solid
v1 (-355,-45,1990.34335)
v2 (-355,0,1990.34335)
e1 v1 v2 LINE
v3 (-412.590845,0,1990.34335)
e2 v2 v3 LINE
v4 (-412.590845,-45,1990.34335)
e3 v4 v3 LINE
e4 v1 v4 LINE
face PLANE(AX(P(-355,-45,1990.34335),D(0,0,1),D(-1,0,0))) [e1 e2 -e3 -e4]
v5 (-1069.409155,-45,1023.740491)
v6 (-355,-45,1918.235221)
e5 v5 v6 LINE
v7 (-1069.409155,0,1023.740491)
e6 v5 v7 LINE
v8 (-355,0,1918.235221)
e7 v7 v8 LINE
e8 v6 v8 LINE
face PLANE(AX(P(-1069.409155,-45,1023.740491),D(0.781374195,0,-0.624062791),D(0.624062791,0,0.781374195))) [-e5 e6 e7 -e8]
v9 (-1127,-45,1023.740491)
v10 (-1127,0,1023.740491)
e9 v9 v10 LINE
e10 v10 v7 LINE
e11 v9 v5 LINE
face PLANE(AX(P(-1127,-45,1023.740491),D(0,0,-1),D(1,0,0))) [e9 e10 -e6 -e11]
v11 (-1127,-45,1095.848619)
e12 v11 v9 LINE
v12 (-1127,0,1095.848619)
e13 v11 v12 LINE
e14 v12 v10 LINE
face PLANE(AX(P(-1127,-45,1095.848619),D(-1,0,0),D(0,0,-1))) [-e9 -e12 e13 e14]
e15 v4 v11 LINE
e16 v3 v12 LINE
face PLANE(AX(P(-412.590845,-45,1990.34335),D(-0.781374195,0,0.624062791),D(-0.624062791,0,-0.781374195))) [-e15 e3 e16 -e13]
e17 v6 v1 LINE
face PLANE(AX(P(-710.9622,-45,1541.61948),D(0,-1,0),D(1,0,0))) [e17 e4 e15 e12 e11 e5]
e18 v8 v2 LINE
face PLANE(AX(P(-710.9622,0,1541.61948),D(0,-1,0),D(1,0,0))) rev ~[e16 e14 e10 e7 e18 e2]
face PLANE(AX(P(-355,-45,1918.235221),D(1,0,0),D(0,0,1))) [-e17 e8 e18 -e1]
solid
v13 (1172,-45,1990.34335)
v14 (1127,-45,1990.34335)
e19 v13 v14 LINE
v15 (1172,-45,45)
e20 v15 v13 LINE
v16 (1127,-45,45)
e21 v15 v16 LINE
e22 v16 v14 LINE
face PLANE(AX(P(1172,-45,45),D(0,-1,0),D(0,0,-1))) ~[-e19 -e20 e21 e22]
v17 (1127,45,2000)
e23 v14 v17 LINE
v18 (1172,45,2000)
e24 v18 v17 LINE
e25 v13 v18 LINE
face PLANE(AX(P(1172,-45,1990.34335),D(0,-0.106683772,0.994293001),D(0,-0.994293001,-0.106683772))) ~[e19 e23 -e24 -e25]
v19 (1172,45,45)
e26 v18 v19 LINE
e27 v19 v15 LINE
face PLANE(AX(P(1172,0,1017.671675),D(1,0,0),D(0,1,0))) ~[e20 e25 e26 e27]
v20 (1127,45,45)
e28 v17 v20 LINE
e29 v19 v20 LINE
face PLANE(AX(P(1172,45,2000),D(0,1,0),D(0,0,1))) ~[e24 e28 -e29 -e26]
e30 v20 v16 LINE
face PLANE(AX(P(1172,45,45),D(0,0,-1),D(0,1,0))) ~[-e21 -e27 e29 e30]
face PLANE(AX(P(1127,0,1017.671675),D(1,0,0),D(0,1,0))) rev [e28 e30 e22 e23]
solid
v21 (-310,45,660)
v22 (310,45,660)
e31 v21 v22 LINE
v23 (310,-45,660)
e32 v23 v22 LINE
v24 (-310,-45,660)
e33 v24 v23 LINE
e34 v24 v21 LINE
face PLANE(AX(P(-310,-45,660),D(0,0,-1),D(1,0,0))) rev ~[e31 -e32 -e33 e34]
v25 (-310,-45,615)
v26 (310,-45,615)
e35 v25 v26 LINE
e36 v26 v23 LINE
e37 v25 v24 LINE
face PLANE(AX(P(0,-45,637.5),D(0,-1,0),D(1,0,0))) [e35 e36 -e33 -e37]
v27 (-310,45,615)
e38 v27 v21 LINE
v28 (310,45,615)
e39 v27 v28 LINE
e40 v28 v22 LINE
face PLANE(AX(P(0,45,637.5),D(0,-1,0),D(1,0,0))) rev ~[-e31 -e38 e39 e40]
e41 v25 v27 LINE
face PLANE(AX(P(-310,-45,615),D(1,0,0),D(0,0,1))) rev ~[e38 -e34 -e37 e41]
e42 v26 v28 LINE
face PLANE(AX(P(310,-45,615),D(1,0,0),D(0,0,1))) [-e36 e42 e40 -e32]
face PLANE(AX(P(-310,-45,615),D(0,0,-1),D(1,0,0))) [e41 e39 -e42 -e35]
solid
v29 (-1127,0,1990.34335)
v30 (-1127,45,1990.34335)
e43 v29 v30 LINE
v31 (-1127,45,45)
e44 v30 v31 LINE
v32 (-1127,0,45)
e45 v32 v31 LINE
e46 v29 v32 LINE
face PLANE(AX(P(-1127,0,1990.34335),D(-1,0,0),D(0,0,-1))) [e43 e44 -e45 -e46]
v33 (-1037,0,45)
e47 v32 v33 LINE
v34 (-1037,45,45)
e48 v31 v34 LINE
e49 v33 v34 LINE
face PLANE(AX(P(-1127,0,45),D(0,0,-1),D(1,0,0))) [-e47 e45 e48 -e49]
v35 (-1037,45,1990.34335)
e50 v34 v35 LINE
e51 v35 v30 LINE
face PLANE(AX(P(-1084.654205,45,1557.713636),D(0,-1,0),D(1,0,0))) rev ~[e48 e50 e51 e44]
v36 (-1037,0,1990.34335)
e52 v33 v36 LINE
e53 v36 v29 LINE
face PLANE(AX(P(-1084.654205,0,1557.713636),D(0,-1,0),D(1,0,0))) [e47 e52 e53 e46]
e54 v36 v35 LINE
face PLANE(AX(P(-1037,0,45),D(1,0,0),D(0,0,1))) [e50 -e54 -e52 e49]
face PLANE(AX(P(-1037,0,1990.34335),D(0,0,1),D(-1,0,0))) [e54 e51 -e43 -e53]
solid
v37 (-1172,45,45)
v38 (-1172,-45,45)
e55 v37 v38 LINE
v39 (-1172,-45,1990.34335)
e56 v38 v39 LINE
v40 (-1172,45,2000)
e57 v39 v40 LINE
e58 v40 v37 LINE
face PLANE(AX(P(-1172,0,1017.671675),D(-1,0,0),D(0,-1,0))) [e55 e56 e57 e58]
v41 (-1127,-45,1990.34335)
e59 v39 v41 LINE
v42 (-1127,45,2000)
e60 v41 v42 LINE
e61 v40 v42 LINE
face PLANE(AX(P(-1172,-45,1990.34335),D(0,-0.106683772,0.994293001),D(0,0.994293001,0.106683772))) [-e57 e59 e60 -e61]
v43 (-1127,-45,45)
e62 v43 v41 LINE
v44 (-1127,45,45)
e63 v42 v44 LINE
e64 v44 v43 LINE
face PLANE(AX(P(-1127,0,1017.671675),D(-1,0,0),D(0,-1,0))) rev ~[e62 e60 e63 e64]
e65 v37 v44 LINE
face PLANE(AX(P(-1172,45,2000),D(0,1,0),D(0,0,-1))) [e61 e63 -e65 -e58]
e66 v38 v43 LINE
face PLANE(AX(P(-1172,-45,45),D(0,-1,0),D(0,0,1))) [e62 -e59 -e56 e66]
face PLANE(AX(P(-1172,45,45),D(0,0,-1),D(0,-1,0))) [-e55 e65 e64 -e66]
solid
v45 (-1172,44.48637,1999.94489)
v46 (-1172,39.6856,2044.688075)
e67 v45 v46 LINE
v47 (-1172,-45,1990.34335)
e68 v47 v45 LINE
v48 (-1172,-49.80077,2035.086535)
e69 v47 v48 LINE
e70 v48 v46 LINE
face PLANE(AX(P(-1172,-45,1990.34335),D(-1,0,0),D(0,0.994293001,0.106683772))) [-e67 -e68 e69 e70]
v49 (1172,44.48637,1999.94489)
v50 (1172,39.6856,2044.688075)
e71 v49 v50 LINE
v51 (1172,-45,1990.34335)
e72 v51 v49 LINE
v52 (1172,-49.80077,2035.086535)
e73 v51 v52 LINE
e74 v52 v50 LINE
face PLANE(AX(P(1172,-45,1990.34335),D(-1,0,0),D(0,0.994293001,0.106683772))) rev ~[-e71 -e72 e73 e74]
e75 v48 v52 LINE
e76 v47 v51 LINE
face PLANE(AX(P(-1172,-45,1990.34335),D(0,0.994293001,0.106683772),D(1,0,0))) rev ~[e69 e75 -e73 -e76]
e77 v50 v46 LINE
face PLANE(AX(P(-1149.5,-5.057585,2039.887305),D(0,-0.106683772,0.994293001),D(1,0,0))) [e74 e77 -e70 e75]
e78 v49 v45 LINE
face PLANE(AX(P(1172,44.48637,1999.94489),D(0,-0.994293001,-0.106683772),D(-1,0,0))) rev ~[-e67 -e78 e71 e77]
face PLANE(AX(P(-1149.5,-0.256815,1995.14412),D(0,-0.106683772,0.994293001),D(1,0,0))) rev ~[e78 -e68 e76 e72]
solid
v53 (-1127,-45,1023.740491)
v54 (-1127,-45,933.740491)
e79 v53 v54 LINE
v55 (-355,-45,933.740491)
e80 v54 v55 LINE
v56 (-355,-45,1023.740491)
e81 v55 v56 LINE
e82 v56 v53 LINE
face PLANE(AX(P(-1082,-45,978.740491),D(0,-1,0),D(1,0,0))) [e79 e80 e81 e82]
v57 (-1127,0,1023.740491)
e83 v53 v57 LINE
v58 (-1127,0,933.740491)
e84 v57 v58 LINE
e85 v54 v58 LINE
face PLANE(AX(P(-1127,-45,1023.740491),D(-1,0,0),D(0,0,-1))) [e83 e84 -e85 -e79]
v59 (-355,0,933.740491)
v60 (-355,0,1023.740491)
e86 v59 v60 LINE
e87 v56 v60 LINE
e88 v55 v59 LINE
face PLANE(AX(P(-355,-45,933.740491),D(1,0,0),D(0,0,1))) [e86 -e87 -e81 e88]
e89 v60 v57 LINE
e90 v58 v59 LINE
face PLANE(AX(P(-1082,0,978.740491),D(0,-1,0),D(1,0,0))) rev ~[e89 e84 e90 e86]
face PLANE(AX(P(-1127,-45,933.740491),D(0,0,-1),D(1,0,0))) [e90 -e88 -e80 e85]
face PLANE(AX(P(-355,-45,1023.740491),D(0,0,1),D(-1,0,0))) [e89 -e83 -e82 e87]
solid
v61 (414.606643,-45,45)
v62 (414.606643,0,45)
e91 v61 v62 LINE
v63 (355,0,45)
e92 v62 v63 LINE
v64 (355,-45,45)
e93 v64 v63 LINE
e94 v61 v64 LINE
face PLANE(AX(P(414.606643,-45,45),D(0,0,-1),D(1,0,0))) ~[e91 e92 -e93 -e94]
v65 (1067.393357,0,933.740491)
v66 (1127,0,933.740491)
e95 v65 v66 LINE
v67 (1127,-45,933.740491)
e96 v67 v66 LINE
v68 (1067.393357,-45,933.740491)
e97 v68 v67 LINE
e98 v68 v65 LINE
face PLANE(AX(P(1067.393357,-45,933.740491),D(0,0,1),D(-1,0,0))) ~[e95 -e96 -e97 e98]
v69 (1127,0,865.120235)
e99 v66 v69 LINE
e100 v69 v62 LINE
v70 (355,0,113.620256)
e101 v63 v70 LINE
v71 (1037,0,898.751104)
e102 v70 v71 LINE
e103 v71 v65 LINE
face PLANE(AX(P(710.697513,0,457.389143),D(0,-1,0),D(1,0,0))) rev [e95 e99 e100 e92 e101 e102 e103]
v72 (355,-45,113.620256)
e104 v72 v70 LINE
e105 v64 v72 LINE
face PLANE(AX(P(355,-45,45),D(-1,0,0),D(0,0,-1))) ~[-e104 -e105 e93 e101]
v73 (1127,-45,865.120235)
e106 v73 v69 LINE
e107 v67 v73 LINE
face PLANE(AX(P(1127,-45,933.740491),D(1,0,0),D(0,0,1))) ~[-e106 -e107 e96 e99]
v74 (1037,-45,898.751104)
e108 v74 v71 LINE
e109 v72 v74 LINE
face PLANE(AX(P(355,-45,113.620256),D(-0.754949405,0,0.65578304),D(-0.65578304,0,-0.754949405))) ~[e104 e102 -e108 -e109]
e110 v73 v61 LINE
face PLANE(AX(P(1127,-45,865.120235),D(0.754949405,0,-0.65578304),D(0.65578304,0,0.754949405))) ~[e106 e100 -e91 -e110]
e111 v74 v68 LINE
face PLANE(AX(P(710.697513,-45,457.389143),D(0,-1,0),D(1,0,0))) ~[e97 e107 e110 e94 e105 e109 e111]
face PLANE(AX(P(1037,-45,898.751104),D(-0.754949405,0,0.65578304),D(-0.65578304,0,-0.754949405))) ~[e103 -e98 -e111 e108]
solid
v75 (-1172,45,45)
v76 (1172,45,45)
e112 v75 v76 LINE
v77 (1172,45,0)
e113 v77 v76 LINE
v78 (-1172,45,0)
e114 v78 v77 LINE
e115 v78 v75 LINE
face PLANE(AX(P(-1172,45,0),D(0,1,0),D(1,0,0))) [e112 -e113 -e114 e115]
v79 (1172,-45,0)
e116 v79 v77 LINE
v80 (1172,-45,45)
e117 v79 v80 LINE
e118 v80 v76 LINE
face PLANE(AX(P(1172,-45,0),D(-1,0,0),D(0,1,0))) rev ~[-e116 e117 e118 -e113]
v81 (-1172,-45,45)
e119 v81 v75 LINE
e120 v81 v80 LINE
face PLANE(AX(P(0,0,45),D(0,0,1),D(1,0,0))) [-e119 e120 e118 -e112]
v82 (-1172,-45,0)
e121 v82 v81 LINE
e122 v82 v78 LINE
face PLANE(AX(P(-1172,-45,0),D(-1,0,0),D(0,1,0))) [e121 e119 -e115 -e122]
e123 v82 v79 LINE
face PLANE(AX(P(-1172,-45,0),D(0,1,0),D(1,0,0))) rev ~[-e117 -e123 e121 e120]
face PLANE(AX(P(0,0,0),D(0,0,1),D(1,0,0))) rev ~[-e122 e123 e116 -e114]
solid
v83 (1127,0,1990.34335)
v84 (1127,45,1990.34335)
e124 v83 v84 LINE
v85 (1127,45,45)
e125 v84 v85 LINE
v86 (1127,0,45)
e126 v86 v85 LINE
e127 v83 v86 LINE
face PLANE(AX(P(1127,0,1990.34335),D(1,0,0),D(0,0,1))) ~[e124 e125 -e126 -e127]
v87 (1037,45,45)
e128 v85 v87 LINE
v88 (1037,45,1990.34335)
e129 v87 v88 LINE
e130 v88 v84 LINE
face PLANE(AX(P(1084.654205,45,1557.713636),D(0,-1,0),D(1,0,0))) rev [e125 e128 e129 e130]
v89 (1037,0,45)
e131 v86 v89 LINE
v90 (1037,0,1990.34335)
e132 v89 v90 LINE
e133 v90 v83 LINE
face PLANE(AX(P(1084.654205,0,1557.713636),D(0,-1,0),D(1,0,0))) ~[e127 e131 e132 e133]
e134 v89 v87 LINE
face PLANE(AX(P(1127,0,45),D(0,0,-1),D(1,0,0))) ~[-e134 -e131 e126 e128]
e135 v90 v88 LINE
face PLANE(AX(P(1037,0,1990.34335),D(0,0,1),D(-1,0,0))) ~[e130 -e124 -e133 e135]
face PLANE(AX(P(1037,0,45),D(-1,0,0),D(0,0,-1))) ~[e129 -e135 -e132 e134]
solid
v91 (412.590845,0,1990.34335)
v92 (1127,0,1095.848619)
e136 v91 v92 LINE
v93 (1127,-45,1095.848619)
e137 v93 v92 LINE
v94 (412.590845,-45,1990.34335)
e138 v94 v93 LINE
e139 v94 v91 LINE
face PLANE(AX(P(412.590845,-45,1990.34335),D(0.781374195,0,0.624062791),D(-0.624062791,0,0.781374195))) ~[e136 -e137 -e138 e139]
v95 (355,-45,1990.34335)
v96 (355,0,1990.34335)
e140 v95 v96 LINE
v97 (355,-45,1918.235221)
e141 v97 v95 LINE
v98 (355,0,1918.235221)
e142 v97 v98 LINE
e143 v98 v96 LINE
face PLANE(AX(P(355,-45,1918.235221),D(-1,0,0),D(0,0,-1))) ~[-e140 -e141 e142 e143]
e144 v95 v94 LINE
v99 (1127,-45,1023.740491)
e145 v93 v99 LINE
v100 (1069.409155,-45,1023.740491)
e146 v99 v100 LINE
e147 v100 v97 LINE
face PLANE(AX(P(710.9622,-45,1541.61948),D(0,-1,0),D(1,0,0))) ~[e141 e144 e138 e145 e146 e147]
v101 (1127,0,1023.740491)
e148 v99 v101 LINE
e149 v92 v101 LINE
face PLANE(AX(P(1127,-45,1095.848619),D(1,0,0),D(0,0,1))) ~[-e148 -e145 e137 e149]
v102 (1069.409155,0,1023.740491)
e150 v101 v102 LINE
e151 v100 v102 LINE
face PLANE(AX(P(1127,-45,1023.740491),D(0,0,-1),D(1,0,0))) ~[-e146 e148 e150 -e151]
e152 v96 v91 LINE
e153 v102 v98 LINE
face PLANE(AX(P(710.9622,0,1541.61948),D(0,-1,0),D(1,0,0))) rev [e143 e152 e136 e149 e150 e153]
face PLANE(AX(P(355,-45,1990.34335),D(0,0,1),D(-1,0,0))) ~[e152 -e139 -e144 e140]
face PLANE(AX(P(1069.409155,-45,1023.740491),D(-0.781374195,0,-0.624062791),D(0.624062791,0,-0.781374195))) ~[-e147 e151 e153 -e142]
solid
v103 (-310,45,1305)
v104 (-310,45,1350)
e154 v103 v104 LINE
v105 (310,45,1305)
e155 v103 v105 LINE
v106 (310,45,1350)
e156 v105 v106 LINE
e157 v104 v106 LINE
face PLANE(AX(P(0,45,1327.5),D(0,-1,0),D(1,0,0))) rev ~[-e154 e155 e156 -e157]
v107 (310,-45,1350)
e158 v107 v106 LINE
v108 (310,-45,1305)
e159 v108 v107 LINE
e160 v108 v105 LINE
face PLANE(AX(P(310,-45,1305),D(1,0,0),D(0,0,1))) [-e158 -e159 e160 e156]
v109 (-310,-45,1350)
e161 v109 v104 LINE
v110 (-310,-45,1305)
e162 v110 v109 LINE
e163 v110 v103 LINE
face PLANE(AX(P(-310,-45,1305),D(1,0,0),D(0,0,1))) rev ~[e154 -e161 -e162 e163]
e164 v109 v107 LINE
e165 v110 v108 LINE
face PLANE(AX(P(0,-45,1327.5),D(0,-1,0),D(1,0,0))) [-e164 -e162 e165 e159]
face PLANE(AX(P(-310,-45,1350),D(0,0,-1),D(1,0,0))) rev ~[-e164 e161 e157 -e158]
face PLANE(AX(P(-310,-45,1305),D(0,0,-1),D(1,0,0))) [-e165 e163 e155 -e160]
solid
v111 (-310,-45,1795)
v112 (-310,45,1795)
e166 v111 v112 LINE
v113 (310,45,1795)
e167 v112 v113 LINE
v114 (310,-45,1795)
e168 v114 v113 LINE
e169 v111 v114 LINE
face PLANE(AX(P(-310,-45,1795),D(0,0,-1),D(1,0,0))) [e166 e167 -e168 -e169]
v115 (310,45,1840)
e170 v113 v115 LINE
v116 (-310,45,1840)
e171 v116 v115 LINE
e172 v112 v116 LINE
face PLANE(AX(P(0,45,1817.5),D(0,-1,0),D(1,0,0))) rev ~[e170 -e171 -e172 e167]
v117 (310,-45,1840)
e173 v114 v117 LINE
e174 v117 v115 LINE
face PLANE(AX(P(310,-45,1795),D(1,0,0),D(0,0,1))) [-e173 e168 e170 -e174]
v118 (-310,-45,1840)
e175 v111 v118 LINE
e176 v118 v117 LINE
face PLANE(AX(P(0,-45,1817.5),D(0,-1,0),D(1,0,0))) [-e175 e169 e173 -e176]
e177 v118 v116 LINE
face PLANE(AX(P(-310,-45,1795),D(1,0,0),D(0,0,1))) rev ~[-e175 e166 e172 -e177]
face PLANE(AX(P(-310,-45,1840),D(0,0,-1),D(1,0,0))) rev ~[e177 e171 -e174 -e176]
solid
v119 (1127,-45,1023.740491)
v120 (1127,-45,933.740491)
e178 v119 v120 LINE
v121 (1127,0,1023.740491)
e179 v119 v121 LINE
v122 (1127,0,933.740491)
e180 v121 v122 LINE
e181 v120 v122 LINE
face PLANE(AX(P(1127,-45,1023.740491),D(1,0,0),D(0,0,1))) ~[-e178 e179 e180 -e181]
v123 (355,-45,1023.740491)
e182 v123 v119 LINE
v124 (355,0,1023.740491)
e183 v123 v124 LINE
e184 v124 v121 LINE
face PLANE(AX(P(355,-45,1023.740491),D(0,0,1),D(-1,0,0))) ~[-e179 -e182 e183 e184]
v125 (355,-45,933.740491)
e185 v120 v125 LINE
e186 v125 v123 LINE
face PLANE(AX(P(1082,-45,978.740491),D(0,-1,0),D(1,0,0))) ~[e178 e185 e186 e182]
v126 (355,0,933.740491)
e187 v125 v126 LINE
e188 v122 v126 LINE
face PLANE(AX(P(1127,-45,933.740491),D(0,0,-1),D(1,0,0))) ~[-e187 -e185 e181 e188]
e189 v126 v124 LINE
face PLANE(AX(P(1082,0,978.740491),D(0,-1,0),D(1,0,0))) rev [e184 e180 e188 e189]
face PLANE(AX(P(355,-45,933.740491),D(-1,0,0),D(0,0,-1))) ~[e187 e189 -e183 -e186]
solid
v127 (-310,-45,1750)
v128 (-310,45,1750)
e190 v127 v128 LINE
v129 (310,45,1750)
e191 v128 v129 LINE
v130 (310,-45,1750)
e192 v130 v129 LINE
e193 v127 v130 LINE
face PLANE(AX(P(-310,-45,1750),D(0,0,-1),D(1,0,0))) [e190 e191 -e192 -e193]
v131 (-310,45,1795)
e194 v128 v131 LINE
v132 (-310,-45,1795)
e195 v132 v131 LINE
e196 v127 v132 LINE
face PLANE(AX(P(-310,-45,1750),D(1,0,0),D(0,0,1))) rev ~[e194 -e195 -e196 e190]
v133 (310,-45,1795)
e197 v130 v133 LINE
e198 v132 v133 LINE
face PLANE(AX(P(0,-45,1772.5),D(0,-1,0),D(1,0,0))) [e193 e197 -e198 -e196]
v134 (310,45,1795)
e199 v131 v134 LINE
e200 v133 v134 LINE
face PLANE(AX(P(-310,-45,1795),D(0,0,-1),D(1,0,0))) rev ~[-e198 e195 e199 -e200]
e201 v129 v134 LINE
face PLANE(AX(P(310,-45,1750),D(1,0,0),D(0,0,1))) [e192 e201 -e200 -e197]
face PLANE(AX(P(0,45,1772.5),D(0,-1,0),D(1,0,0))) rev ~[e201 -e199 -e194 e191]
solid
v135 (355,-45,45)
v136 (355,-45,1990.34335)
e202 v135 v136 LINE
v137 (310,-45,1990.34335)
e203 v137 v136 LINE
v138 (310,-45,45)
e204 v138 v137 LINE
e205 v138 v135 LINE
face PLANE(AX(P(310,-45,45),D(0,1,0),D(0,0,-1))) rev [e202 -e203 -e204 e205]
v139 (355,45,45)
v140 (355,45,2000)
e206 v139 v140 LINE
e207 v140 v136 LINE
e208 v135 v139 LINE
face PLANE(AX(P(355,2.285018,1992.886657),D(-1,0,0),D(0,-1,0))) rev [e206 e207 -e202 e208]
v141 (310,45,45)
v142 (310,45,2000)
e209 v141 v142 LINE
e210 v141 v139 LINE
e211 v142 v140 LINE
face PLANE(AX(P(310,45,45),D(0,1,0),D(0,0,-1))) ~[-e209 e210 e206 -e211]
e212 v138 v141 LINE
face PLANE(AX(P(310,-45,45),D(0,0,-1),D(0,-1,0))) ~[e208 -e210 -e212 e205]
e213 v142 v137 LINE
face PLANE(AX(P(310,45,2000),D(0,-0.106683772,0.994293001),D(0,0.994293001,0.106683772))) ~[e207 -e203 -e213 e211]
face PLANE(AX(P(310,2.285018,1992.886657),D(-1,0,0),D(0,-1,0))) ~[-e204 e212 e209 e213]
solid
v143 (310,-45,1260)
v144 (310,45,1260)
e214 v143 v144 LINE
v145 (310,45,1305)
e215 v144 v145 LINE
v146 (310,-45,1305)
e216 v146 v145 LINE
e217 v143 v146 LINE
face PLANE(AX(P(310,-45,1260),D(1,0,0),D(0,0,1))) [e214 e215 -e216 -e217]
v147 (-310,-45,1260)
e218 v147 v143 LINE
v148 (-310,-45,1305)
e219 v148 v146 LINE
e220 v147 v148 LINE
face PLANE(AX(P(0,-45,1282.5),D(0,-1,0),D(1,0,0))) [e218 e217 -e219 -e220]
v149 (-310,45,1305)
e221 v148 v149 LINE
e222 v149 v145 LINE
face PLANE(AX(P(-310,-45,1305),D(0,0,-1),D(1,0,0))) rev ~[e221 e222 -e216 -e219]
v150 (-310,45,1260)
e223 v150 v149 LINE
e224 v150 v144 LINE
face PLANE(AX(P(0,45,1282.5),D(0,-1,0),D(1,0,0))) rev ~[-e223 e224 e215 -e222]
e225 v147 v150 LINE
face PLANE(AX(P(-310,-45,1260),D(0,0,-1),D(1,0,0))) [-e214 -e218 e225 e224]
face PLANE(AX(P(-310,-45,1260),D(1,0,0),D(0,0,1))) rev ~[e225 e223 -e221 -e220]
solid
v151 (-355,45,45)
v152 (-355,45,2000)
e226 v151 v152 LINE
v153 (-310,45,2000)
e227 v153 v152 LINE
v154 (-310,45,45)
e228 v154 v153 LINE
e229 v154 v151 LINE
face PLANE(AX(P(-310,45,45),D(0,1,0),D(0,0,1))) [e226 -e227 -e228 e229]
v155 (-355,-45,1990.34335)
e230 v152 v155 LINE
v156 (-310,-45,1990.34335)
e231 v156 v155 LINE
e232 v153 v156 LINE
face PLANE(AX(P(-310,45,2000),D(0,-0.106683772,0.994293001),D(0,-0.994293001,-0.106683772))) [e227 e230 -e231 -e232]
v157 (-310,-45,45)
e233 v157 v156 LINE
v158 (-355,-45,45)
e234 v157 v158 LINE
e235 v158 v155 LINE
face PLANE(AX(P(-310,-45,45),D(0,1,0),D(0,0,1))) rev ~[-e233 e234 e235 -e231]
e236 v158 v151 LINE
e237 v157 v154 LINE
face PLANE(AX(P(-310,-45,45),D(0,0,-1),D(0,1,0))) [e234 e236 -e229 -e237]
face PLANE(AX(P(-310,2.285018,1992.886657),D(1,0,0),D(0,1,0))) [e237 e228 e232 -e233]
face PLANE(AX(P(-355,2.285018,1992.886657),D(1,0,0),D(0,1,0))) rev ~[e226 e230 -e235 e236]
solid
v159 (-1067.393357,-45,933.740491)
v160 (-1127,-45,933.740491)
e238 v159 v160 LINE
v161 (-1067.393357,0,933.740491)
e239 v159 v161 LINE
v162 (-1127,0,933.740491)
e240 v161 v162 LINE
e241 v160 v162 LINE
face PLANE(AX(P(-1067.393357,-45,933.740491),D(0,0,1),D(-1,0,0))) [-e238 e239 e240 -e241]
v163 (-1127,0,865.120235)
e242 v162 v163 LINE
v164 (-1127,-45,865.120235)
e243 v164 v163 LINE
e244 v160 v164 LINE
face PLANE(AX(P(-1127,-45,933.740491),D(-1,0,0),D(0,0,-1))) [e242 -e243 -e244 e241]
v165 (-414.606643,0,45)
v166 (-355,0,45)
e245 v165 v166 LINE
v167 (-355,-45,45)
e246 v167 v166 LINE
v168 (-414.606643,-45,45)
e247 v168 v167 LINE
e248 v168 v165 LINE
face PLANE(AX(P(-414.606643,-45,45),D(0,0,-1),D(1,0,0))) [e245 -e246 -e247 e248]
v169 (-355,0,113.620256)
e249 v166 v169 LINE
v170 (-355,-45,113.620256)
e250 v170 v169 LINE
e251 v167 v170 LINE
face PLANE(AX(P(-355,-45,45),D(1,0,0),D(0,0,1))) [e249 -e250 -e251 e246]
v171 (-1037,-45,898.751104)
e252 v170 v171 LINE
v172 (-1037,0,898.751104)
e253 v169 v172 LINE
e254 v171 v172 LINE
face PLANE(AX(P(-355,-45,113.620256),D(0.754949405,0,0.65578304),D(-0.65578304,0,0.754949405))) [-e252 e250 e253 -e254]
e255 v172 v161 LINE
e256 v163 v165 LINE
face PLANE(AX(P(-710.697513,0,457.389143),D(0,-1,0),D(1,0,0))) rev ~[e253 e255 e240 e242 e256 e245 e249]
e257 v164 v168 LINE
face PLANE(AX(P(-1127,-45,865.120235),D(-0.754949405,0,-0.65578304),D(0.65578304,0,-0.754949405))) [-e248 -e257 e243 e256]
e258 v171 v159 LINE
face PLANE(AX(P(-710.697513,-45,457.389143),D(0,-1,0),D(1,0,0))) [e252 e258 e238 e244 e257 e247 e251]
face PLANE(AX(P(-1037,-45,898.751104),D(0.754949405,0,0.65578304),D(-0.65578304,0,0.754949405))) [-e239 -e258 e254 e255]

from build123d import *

# Parameters (mm, degrees)
F0_W      = 2344
F0_H      = 90
F1_DEPTH  = 45
F2_W      = 90
F2_H      = 1945.34335
F5_DEPTH  = 45
F4_W      = 90
F4_H      = 1945.34335
F7_DEPTH  = 45
F8_W      = 45
F8_H      = 90
F8_W_2    = 2299
F9_DEPTH  = 45
F10_W     = 620
F10_H     = 45
F11_DEPTH = 90
F12_DEPTH = 90
F13_DEPTH = 45
F10_W_2   = 682
F10_H_2   = 90
F14_DEPTH = 45
F16_START = -45
F16_DEPTH = 45


# Not quite as in the source:
# - a feature names something its author has since deleted; it is built from what else it names


with BuildPart() as f1:
    # F0 (on Top) → F1 (new body)
    with BuildSketch(Plane.XY):
        Rectangle(F0_W, F0_H)
    extrude(amount=F1_DEPTH)


with BuildPart() as f5:
    # F2 (on face) → F5 (new body)
    with BuildSketch(Plane(origin=(-1172, 0, 0), x_dir=(0, -1, 0), z_dir=(-1, 0, 0))):
        with Locations((0, 1017.671675)):
            Rectangle(F2_W, F2_H)
        Polygon((-45, 2000), (-45, 1990.34335), (45, 1990.34335), align=None)
    extrude(amount=-F5_DEPTH)


with BuildPart() as f6_1:
    # F6: instance of F5
    add(f5.part.mirror(Plane.YZ))


with BuildPart() as f7:
    # F4 (on offset) → F7 (new body)
    with BuildSketch(Plane.YZ.offset(-310)):
        Polygon((-45, 1990.34335), (45, 1990.34335), (45, 2000), align=None)
        with Locations((0, 1017.671675)):
            Rectangle(F4_W, F4_H)
    extrude(amount=-F7_DEPTH)


with BuildPart() as f9:
    # F8 (on face) → F9 (new body)
    with BuildSketch(Plane(origin=(0, -211.6376922213, 1972.4637736601), x_dir=(1, 0, 0), z_dir=(0, -0.1066837724, 0.9942930014))):
        with Locations((-1149.5, 212.5941518041)):
            Rectangle(F8_W, F8_H)
        with Locations((22.5, 212.5941518041)):
            Rectangle(F8_W_2, F8_H)
    extrude(amount=F9_DEPTH)


with BuildPart() as f11:
    # F10 (on face) → F11 (new body)
    with BuildSketch(Plane.XZ.offset(45)):
        with Locations((0, 1282.5)):
            Rectangle(F10_W, F10_H)
    extrude(amount=-F11_DEPTH)


with BuildPart() as f11b:
    # F10 (on face) → F11, piece 2 (new body)
    with BuildSketch(Plane.XZ.offset(45)):
        with Locations((0, 1772.5)):
            Rectangle(F10_W, F10_H)
    extrude(amount=-F11_DEPTH)


with BuildPart() as f12:
    # F10 (on face) → F12 (new body)
    with BuildSketch(Plane.XZ.offset(45)):
        with Locations((0, 637.5)):
            Rectangle(F10_W, F10_H)
    extrude(amount=-F12_DEPTH)


with BuildPart() as f12b:
    # F10 (on face) → F12, piece 2 (new body)
    with BuildSketch(Plane.XZ.offset(45)):
        with Locations((0, 1327.5)):
            Rectangle(F10_W, F10_H)
    extrude(amount=-F12_DEPTH)


with BuildPart() as f12c:
    # F10 (on face) → F12, piece 3 (new body)
    with BuildSketch(Plane.XZ.offset(45)):
        with Locations((0, 1817.5)):
            Rectangle(F10_W, F10_H)
    extrude(amount=-F12_DEPTH)


with BuildPart() as f13:
    # F10 (on face) → F13 (new body)
    with BuildSketch(Plane.XZ.offset(45)):
        Polygon((-355, 1918.2352214167), (-355, 1990.34335), (-412.5908448117, 1990.34335), (-1037, 1208.5354810911), (-1037, 1064.3192239245), align=None)
        Polygon((-1037, 1064.3192239245), (-1037, 1208.5354810911), (-1127, 1095.8486192519), (-1127, 1023.7404906686), (-1069.4091551883, 1023.7404906686), align=None)
    extrude(amount=-F13_DEPTH)


with BuildPart() as f13b:
    # F10 (on face) → F13, piece 2 (new body)
    with BuildSketch(Plane.XZ.offset(45)):
        Polygon((-355, 45), (-355, 113.6202558639), (-1037, 898.751103838), (-1037, 761.5105921102), (-414.6066434275, 45), align=None)
        Polygon((-1067.3933565725, 933.7404906686), (-1127, 933.7404906686), (-1127, 865.1202348048), (-1037, 761.5105921102), (-1037, 898.751103838), align=None)
    extrude(amount=-F13_DEPTH)


with BuildPart() as f14:
    # F10 (on face) → F14 (new body)
    with BuildSketch(Plane.XZ.offset(45)):
        Polygon((-1037, 933.7404906686), (-1037, 1023.7404906686), (-1069.4091551883, 1023.7404906686), (-1127, 1023.7404906686), (-1127, 933.7404906686), (-1067.3933565725, 933.7404906686), align=None)
        with Locations((-696, 978.7404906686)):
            Rectangle(F10_W_2, F10_H_2)
    extrude(amount=-F14_DEPTH)


with BuildPart() as f15_1:
    # F15: instance of F13
    add(f13.part.mirror(Plane.YZ))


with BuildPart() as f15_2:
    # F15: instance of F13b
    add(f13b.part.mirror(Plane.YZ))


with BuildPart() as f15_3:
    # F15: instance of F7
    add(f7.part.mirror(Plane.YZ))


with BuildPart() as f15_4:
    # F15: instance of F14
    add(f14.part.mirror(Plane.YZ))


with BuildPart() as f16:
    # F10 (on face) → F16 (new body)
    with BuildSketch(Plane.XZ.offset(45).offset(F16_START)):
        Polygon((-1127, 1095.8486192519), (-1037, 1208.5354810911), (-1037, 1990.34335), (-1127, 1990.34335), align=None)
        Polygon((-1037, 1064.3192239245), (-1037, 1208.5354810911), (-1127, 1095.8486192519), (-1127, 1023.7404906686), (-1069.4091551883, 1023.7404906686), align=None)
        Polygon((-1037, 1023.7404906686), (-1037, 1064.3192239245), (-1069.4091551883, 1023.7404906686), align=None)
        Polygon((-1037, 933.7404906686), (-1037, 1023.7404906686), (-1069.4091551883, 1023.7404906686), (-1127, 1023.7404906686), (-1127, 933.7404906686), (-1067.3933565725, 933.7404906686), align=None)
        Polygon((-1037, 898.751103838), (-1037, 933.7404906686), (-1067.3933565725, 933.7404906686), align=None)
        Polygon((-1067.3933565725, 933.7404906686), (-1127, 933.7404906686), (-1127, 865.1202348048), (-1037, 761.5105921102), (-1037, 898.751103838), align=None)
        Polygon((-1037, 761.5105921102), (-1127, 865.1202348048), (-1127, 45), (-1037, 45), align=None)
    extrude(amount=-F16_DEPTH)


with BuildPart() as f17_1:
    # F17: instance of F16
    add(f16.part.mirror(Plane.YZ))


solid = Compound([f1.part, f5.part, f6_1.part, f7.part, f9.part, f11.part, f11b.part, f12.part, f12b.part, f12c.part, f13.part, f13b.part, f14.part, f15_1.part, f15_2.part, f15_3.part, f15_4.part, f16.part, f17_1.part])
